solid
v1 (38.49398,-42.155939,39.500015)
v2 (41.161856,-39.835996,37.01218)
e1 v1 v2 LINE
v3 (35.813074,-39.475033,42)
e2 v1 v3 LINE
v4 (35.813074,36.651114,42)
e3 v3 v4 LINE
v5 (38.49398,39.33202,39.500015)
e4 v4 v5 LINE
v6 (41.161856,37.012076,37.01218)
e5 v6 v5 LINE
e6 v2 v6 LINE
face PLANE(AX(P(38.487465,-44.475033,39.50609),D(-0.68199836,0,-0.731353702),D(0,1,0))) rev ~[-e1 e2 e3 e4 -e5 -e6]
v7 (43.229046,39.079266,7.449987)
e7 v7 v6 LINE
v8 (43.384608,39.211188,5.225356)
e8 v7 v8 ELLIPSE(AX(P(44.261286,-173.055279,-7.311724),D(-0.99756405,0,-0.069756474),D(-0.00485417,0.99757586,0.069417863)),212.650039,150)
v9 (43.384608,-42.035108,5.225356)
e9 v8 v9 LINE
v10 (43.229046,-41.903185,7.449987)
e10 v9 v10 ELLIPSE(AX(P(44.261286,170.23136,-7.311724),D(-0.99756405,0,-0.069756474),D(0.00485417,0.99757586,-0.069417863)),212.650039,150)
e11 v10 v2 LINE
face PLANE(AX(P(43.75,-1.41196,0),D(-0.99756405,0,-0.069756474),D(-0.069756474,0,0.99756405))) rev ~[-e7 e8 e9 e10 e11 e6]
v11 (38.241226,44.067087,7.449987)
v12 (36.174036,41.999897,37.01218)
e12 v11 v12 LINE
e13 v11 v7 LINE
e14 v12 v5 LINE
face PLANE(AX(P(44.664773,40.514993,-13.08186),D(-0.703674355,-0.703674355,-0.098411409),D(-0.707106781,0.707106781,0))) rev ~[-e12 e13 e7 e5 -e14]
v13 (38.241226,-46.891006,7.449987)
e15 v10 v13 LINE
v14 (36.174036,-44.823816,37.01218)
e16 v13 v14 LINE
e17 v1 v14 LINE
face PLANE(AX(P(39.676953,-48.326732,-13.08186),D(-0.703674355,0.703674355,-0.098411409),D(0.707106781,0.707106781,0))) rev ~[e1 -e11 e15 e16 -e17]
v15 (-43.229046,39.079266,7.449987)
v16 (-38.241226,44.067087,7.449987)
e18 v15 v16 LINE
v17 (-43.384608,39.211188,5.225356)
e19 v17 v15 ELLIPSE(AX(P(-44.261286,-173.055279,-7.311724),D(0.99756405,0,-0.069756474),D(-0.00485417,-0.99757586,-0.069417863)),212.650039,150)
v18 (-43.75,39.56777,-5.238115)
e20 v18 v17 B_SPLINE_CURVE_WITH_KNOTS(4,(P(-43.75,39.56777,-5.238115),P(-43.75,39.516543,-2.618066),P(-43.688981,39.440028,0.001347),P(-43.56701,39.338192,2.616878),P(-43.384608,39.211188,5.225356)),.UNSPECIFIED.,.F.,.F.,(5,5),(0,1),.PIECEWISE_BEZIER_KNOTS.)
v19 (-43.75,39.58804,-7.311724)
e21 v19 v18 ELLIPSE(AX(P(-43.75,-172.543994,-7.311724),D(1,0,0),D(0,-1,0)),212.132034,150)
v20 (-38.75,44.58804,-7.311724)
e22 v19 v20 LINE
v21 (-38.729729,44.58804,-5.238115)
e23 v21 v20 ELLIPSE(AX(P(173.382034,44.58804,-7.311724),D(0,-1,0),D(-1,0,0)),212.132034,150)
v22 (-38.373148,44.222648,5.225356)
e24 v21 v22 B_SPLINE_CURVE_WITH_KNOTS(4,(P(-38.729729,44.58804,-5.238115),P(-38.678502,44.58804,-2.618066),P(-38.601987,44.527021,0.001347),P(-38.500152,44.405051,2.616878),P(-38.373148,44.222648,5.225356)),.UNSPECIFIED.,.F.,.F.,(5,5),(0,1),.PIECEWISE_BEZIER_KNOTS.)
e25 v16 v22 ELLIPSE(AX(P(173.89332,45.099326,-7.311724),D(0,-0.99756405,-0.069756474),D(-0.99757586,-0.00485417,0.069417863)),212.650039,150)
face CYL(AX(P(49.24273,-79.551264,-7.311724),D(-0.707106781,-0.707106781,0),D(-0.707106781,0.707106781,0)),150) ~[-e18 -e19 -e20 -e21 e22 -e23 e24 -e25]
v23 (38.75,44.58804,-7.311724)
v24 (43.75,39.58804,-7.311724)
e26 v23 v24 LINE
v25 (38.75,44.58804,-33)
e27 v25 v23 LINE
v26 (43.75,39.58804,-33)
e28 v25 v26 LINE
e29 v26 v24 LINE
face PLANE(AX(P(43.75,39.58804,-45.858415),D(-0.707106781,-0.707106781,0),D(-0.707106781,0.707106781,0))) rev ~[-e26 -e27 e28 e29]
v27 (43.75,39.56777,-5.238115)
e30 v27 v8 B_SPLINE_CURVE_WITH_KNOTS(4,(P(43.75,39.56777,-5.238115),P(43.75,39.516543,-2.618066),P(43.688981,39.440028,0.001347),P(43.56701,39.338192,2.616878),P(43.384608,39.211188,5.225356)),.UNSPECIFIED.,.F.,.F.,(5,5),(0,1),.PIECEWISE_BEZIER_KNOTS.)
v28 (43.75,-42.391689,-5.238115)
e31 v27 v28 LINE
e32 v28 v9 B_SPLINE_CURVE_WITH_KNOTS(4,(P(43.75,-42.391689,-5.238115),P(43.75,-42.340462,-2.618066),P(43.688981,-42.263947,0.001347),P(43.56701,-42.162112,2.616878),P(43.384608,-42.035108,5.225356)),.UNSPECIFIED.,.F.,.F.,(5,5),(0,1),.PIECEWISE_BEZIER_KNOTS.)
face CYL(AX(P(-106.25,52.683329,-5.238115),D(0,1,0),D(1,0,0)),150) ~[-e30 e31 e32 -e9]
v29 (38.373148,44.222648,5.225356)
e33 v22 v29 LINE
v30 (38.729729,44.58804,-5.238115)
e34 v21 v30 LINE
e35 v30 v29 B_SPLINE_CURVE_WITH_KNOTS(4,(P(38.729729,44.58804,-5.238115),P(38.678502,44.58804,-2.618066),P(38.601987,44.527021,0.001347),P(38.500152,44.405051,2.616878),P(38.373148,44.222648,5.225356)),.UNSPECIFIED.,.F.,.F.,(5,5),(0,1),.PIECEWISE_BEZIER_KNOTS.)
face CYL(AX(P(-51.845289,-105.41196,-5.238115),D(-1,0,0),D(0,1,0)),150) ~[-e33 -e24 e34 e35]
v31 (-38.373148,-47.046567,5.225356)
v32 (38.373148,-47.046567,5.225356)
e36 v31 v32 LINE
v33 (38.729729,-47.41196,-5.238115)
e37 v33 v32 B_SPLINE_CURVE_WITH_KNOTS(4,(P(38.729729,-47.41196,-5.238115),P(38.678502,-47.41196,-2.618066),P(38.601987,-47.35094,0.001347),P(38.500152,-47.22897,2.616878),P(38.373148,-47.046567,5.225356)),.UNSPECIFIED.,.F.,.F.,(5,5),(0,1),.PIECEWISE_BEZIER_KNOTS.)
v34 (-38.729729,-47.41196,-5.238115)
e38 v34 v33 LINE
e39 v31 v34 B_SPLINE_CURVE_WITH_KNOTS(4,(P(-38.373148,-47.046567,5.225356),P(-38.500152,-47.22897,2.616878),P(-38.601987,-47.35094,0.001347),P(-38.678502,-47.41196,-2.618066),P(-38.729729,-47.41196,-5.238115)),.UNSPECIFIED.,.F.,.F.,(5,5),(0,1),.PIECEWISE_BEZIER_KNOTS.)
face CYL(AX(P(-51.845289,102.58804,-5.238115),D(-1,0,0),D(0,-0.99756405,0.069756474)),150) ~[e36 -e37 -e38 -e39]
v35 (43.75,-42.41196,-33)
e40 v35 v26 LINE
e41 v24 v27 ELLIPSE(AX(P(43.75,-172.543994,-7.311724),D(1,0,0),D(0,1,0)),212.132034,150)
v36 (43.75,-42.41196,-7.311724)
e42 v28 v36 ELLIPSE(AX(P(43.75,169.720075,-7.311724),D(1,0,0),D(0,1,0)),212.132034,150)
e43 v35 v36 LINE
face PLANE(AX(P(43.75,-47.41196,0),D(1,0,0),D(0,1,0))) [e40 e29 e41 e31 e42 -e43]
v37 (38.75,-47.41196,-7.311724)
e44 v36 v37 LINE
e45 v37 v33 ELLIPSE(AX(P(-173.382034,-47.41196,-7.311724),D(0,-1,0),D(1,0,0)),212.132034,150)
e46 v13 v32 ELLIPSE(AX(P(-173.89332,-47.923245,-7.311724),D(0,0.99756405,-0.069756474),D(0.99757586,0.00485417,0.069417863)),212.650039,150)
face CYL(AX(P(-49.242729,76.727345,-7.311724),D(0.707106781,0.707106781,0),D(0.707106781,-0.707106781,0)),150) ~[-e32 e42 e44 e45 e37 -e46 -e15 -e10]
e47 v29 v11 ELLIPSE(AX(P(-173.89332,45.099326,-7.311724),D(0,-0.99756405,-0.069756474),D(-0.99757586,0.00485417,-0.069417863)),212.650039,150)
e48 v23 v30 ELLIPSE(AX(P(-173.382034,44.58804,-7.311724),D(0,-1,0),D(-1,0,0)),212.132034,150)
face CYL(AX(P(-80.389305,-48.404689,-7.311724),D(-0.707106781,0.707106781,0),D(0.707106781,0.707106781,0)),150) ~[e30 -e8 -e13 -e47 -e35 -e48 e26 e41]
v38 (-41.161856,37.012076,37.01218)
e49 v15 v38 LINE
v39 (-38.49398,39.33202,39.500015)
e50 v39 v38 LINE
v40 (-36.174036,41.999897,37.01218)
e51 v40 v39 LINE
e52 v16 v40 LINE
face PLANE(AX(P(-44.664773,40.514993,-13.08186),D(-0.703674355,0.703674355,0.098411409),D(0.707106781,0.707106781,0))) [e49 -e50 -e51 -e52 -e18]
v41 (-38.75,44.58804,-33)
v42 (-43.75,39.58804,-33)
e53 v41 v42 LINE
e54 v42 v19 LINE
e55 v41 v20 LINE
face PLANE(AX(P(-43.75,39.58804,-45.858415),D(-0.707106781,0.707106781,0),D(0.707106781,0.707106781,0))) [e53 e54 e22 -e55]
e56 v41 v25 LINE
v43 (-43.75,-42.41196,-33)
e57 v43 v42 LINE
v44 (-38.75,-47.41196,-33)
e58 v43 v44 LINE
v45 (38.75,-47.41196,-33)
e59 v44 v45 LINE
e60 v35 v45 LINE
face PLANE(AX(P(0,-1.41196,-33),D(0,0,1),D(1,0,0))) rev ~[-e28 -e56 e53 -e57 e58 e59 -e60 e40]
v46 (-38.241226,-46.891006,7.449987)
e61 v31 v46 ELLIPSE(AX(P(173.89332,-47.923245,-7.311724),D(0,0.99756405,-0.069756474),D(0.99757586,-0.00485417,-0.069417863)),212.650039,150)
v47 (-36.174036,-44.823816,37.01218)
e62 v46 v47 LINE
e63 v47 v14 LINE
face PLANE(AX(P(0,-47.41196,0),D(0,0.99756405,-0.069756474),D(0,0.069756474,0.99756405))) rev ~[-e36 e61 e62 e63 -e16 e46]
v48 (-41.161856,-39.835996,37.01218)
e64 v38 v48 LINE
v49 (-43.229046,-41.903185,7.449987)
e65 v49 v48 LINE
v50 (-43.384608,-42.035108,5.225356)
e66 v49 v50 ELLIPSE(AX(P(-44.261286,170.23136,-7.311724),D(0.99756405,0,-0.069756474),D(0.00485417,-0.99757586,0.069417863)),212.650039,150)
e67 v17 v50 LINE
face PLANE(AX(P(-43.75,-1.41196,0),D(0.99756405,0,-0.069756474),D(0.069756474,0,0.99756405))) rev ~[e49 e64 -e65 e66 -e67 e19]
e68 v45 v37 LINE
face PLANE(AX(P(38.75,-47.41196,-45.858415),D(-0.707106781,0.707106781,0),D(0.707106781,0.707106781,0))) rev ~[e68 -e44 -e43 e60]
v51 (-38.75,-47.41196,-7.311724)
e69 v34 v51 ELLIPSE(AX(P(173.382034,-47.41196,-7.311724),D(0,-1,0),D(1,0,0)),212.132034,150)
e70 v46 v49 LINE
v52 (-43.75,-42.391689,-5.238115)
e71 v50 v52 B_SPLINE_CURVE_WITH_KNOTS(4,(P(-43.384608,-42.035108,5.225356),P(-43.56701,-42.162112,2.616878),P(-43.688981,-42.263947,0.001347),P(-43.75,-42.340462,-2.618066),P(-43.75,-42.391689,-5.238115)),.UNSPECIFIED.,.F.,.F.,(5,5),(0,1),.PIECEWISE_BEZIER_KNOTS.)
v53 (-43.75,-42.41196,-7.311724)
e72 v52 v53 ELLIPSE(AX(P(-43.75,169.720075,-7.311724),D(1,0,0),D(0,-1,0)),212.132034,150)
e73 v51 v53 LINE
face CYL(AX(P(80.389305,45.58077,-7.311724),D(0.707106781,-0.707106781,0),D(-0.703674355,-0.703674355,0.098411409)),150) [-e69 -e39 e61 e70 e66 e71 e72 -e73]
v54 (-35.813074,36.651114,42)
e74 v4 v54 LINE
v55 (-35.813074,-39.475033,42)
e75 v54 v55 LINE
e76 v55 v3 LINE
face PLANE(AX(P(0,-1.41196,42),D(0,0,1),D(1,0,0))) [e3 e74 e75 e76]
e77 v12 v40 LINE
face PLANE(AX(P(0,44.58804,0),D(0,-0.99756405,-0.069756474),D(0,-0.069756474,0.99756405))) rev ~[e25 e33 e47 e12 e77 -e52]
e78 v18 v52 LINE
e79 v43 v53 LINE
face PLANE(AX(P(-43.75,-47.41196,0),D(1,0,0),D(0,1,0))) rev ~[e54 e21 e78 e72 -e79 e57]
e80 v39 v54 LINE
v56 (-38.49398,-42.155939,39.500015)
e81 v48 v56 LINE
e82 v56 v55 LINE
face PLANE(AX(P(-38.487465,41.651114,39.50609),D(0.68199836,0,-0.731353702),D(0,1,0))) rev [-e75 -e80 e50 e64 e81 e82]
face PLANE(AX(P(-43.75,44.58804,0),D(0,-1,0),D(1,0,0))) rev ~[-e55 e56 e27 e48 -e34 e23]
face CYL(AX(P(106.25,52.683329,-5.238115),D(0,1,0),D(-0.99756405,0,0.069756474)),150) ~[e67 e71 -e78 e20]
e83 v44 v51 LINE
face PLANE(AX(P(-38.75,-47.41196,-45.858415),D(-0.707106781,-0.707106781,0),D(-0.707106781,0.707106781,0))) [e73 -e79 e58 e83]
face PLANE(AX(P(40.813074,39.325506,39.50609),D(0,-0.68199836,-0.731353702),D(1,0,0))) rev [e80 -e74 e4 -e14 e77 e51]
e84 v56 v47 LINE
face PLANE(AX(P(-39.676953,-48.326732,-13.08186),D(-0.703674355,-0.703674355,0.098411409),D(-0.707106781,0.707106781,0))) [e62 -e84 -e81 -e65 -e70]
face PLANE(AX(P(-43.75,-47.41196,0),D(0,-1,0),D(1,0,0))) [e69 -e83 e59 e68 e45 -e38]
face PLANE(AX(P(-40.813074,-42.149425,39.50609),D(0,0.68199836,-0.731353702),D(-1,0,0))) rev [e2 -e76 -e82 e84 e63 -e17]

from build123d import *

# Parameters (mm, degrees)
F0_W          = 87.5
F0_H          = 92
F1_DEPTH      = 42
F1_TAPER      = 4
F1_DEPTH_BACK = 33
F5_SIZE       = 5
F6_T1_DEPTH   = 58.7168298797
F6_T3_DEPTH   = 62.7898982715
F6_T5_DEPTH   = 62.7898982715
F6_T7_DEPTH   = 62.7898982715
F6_T9_DEPTH   = 62.7898982715
F7_T1_DEPTH   = 103.6905771188
F7_T3_DEPTH   = 44.0479092504
F7_T5_DEPTH   = 44.0479092504
F7_T7_DEPTH   = 108.1905771188
F7_T9_DEPTH   = 44.0479092503
F7_T11_DEPTH  = 44.0479092503


# Not quite as in the source:
# - a fillet or chamfer that OpenCascade refuses, or shapes differently, is made with other operations: its cross-section is extruded or revolved along the edge and cut away or added


with BuildPart() as f1:
    # F0 (on Top) → F1 (new body, two sides)
    with BuildSketch(Plane.XY) as f1_sk:
        with Locations((0, -1.4119595289)):
            Rectangle(F0_W, F0_H)
    extrude(amount=F1_DEPTH, taper=F1_TAPER)
    extrude(f1_sk.sketch, amount=-F1_DEPTH_BACK)

    # F5
    f5_edges = [f1.edges().sort_by_distance(p)[0] for p in [
        (0, -44.475033, 42),
        (40.813074, -1.41196, 42),
        (0, 41.651114, 42),
        (-40.813074, -1.41196, 42),
    ]]
    chamfer(f5_edges, length=F5_SIZE)

    # F6: chamfer of 5 on 8 edges, made by hand

    # F6_s2 → F6_t1 (cut)
    with BuildSketch(Plane.XY.offset(-45.8584149398)):
        Polygon((43.75, 39.5880404711), (38.75, 44.5880404711), (43.75, 44.5880404711), align=None)
        Polygon((-43.75, 39.5880404711), (-38.75, 44.5880404711), (-43.75, 44.5880404711), align=None)
        Polygon((-38.75, -47.4119595289), (-43.75, -42.4119595289), (-43.75, -47.4119595289), align=None)
        Polygon((38.75, -47.4119595289), (43.75, -42.4119595289), (43.75, -47.4119595289), align=None)
    extrude(amount=F6_T1_DEPTH, mode=Mode.SUBTRACT)

    # F6_s4 → F6_t3 (cut)
    with BuildSketch(Plane(origin=(-1.3320626645, -1.3320626645, -19.0493835976), x_dir=(-0.7071067812, 0.7071067812, 0), z_dir=(0.0695873743, 0.0695873743, 0.9951458158))):
        Polygon((-6.1163179384, 60.6385318402), (0.9375251077, 60.6385318402), (-2.5893964153, 64.1483330365), align=None)
    extrude(amount=F6_T3_DEPTH, mode=Mode.SUBTRACT)

    # F6_s6 → F6_t5 (cut)
    with BuildSketch(Plane(origin=(1.3320626645, -1.3320626645, -19.0493835976), x_dir=(-0.7071067812, -0.7071067812, 0), z_dir=(-0.0695873743, 0.0695873743, 0.9951458158))):
        Polygon((6.1163179384, 60.6385318402), (-0.9375251077, 60.6385318402), (2.5893964153, 64.1483330365), align=None)
    extrude(amount=F6_T5_DEPTH, mode=Mode.SUBTRACT)

    # F6_s8 → F6_t7 (cut)
    with BuildSketch(Plane(origin=(-1.3183881113, 1.3183881113, -18.8538283766), x_dir=(0.7071067812, 0.7071067812, 0), z_dir=(0.0695873743, -0.0695873743, 0.9951458158))):
        Polygon((-2.934337423, 58.6514124197), (4.119505623, 58.6514124197), (0.5925841, 62.161213616), align=None)
    extrude(amount=F6_T7_DEPTH, mode=Mode.SUBTRACT)

    # F6_s10 → F6_t9 (cut)
    with BuildSketch(Plane(origin=(1.3183881113, 1.3183881113, -18.8538283766), x_dir=(0.7071067812, -0.7071067812, 0), z_dir=(-0.0695873743, -0.0695873743, 0.9951458158))):
        Polygon((2.934337423, 58.6514124197), (-4.119505623, 58.6514124197), (-0.5925841, 62.161213616), align=None)
    extrude(amount=F6_T9_DEPTH, mode=Mode.SUBTRACT)

    # F7: fillet of radius 150 on 8 edges, made by hand

    # F7_s2 → F7_t1 (cut)
    with BuildSketch(Plane.YZ.offset(-51.8452885594)):
        with BuildLine():
            ThreePointArc((-47.0465670679, 5.2253556379), (-47.3205835818, -0.0031909184), (-47.4119595289, -5.2381154238))
            Line((-47.4119595289, -5.2381154238), (-47.4119595289, 0))
            Line((-47.4119595289, 0), (-47.0465670679, 5.2253556379))
        make_face()
        with BuildLine():
            ThreePointArc((44.5880404711, -5.2381154238), (44.4966645239, -0.0031909184), (44.2226480101, 5.2253556379))
            Line((44.2226480101, 5.2253556379), (44.5880404711, 0))
            Line((44.5880404711, 0), (44.5880404711, -5.2381154238))
        make_face()
    extrude(amount=F7_T1_DEPTH, mode=Mode.SUBTRACT)

    # F7_s4 → F7_t3 (cut)
    with BuildSketch(Plane(origin=(13.7423078996, 13.7423078996, 0), x_dir=(0, 0, 1), z_dir=(-0.7071067812, -0.7071067812, 0))):
        with BuildLine():
            ThreePointArc((-7.3117239806, -60.9257058632), (0.078105005, -60.7435633688), (7.4499872987, -60.1975782307))
            Line((7.4499872987, -60.1975782307), (0.0870892603, -60.9257058632))
            Line((0.0870892603, -60.9257058632), (-7.3117239806, -60.9257058632))
        make_face()
    extrude(amount=F7_T3_DEPTH, mode=Mode.SUBTRACT)

    # F7_s6 → F7_t5 (cut)
    with BuildSketch(Plane(origin=(17.4042674285, -17.4042674285, 0), x_dir=(0, 0, 1), z_dir=(-0.7071067812, 0.7071067812, 0))):
        with BuildLine():
            ThreePointArc((7.4499872987, -60.1975782307), (0.078105005, -60.7435633688), (-7.3117239806, -60.9257058632))
            Line((-7.3117239806, -60.9257058632), (0.0870892603, -60.9257058632))
            Line((0.0870892603, -60.9257058632), (7.4499872987, -60.1975782307))
        make_face()
    extrude(amount=F7_T5_DEPTH, mode=Mode.SUBTRACT)

    # F7_s8 → F7_t7 (cut)
    with BuildSketch(Plane.XZ.offset(-52.6833290305)):
        with BuildLine():
            ThreePointArc((43.75, -5.2381154238), (43.6586240529, -0.0031909184), (43.384607539, 5.2253556379))
            Line((43.384607539, 5.2253556379), (43.75, 0))
            Line((43.75, 0), (43.75, -5.2381154238))
        make_face()
        with BuildLine():
            ThreePointArc((-43.384607539, 5.2253556379), (-43.6586240529, -0.0031909184), (-43.75, -5.2381154238))
            Line((-43.75, -5.2381154238), (-43.75, 0))
            Line((-43.75, 0), (-43.384607539, 5.2253556379))
        make_face()
    extrude(amount=F7_T7_DEPTH, mode=Mode.SUBTRACT)

    # F7_s10 → F7_t9 (cut)
    with BuildSketch(Plane(origin=(-15.1542674285, -15.1542674285, 0), x_dir=(0, 0, 1), z_dir=(0.7071067812, 0.7071067812, 0))):
        with BuildLine():
            ThreePointArc((-7.3117239809, -58.9288935479), (0.0781050046, -58.7467510535), (7.4499872984, -58.2007659154))
            Line((7.4499872984, -58.2007659154), (0.08708926, -58.9288935479))
            Line((0.08708926, -58.9288935479), (-7.3117239809, -58.9288935479))
        make_face()
    extrude(amount=F7_T9_DEPTH, mode=Mode.SUBTRACT)

    # F7_s12 → F7_t11 (cut)
    with BuildSketch(Plane(origin=(-15.9923078995, 15.9923078995, 0), x_dir=(0, 0, 1), z_dir=(0.7071067812, -0.7071067812, 0))):
        with BuildLine():
            ThreePointArc((-7.3117239809, -58.9288935479), (0.0781050046, -58.7467510535), (7.4499872984, -58.2007659154))
            Line((7.4499872984, -58.2007659154), (0.08708926, -58.9288935479))
            Line((0.08708926, -58.9288935479), (-7.3117239809, -58.9288935479))
        make_face()
    extrude(amount=F7_T11_DEPTH, mode=Mode.SUBTRACT)


solid = f1.part
